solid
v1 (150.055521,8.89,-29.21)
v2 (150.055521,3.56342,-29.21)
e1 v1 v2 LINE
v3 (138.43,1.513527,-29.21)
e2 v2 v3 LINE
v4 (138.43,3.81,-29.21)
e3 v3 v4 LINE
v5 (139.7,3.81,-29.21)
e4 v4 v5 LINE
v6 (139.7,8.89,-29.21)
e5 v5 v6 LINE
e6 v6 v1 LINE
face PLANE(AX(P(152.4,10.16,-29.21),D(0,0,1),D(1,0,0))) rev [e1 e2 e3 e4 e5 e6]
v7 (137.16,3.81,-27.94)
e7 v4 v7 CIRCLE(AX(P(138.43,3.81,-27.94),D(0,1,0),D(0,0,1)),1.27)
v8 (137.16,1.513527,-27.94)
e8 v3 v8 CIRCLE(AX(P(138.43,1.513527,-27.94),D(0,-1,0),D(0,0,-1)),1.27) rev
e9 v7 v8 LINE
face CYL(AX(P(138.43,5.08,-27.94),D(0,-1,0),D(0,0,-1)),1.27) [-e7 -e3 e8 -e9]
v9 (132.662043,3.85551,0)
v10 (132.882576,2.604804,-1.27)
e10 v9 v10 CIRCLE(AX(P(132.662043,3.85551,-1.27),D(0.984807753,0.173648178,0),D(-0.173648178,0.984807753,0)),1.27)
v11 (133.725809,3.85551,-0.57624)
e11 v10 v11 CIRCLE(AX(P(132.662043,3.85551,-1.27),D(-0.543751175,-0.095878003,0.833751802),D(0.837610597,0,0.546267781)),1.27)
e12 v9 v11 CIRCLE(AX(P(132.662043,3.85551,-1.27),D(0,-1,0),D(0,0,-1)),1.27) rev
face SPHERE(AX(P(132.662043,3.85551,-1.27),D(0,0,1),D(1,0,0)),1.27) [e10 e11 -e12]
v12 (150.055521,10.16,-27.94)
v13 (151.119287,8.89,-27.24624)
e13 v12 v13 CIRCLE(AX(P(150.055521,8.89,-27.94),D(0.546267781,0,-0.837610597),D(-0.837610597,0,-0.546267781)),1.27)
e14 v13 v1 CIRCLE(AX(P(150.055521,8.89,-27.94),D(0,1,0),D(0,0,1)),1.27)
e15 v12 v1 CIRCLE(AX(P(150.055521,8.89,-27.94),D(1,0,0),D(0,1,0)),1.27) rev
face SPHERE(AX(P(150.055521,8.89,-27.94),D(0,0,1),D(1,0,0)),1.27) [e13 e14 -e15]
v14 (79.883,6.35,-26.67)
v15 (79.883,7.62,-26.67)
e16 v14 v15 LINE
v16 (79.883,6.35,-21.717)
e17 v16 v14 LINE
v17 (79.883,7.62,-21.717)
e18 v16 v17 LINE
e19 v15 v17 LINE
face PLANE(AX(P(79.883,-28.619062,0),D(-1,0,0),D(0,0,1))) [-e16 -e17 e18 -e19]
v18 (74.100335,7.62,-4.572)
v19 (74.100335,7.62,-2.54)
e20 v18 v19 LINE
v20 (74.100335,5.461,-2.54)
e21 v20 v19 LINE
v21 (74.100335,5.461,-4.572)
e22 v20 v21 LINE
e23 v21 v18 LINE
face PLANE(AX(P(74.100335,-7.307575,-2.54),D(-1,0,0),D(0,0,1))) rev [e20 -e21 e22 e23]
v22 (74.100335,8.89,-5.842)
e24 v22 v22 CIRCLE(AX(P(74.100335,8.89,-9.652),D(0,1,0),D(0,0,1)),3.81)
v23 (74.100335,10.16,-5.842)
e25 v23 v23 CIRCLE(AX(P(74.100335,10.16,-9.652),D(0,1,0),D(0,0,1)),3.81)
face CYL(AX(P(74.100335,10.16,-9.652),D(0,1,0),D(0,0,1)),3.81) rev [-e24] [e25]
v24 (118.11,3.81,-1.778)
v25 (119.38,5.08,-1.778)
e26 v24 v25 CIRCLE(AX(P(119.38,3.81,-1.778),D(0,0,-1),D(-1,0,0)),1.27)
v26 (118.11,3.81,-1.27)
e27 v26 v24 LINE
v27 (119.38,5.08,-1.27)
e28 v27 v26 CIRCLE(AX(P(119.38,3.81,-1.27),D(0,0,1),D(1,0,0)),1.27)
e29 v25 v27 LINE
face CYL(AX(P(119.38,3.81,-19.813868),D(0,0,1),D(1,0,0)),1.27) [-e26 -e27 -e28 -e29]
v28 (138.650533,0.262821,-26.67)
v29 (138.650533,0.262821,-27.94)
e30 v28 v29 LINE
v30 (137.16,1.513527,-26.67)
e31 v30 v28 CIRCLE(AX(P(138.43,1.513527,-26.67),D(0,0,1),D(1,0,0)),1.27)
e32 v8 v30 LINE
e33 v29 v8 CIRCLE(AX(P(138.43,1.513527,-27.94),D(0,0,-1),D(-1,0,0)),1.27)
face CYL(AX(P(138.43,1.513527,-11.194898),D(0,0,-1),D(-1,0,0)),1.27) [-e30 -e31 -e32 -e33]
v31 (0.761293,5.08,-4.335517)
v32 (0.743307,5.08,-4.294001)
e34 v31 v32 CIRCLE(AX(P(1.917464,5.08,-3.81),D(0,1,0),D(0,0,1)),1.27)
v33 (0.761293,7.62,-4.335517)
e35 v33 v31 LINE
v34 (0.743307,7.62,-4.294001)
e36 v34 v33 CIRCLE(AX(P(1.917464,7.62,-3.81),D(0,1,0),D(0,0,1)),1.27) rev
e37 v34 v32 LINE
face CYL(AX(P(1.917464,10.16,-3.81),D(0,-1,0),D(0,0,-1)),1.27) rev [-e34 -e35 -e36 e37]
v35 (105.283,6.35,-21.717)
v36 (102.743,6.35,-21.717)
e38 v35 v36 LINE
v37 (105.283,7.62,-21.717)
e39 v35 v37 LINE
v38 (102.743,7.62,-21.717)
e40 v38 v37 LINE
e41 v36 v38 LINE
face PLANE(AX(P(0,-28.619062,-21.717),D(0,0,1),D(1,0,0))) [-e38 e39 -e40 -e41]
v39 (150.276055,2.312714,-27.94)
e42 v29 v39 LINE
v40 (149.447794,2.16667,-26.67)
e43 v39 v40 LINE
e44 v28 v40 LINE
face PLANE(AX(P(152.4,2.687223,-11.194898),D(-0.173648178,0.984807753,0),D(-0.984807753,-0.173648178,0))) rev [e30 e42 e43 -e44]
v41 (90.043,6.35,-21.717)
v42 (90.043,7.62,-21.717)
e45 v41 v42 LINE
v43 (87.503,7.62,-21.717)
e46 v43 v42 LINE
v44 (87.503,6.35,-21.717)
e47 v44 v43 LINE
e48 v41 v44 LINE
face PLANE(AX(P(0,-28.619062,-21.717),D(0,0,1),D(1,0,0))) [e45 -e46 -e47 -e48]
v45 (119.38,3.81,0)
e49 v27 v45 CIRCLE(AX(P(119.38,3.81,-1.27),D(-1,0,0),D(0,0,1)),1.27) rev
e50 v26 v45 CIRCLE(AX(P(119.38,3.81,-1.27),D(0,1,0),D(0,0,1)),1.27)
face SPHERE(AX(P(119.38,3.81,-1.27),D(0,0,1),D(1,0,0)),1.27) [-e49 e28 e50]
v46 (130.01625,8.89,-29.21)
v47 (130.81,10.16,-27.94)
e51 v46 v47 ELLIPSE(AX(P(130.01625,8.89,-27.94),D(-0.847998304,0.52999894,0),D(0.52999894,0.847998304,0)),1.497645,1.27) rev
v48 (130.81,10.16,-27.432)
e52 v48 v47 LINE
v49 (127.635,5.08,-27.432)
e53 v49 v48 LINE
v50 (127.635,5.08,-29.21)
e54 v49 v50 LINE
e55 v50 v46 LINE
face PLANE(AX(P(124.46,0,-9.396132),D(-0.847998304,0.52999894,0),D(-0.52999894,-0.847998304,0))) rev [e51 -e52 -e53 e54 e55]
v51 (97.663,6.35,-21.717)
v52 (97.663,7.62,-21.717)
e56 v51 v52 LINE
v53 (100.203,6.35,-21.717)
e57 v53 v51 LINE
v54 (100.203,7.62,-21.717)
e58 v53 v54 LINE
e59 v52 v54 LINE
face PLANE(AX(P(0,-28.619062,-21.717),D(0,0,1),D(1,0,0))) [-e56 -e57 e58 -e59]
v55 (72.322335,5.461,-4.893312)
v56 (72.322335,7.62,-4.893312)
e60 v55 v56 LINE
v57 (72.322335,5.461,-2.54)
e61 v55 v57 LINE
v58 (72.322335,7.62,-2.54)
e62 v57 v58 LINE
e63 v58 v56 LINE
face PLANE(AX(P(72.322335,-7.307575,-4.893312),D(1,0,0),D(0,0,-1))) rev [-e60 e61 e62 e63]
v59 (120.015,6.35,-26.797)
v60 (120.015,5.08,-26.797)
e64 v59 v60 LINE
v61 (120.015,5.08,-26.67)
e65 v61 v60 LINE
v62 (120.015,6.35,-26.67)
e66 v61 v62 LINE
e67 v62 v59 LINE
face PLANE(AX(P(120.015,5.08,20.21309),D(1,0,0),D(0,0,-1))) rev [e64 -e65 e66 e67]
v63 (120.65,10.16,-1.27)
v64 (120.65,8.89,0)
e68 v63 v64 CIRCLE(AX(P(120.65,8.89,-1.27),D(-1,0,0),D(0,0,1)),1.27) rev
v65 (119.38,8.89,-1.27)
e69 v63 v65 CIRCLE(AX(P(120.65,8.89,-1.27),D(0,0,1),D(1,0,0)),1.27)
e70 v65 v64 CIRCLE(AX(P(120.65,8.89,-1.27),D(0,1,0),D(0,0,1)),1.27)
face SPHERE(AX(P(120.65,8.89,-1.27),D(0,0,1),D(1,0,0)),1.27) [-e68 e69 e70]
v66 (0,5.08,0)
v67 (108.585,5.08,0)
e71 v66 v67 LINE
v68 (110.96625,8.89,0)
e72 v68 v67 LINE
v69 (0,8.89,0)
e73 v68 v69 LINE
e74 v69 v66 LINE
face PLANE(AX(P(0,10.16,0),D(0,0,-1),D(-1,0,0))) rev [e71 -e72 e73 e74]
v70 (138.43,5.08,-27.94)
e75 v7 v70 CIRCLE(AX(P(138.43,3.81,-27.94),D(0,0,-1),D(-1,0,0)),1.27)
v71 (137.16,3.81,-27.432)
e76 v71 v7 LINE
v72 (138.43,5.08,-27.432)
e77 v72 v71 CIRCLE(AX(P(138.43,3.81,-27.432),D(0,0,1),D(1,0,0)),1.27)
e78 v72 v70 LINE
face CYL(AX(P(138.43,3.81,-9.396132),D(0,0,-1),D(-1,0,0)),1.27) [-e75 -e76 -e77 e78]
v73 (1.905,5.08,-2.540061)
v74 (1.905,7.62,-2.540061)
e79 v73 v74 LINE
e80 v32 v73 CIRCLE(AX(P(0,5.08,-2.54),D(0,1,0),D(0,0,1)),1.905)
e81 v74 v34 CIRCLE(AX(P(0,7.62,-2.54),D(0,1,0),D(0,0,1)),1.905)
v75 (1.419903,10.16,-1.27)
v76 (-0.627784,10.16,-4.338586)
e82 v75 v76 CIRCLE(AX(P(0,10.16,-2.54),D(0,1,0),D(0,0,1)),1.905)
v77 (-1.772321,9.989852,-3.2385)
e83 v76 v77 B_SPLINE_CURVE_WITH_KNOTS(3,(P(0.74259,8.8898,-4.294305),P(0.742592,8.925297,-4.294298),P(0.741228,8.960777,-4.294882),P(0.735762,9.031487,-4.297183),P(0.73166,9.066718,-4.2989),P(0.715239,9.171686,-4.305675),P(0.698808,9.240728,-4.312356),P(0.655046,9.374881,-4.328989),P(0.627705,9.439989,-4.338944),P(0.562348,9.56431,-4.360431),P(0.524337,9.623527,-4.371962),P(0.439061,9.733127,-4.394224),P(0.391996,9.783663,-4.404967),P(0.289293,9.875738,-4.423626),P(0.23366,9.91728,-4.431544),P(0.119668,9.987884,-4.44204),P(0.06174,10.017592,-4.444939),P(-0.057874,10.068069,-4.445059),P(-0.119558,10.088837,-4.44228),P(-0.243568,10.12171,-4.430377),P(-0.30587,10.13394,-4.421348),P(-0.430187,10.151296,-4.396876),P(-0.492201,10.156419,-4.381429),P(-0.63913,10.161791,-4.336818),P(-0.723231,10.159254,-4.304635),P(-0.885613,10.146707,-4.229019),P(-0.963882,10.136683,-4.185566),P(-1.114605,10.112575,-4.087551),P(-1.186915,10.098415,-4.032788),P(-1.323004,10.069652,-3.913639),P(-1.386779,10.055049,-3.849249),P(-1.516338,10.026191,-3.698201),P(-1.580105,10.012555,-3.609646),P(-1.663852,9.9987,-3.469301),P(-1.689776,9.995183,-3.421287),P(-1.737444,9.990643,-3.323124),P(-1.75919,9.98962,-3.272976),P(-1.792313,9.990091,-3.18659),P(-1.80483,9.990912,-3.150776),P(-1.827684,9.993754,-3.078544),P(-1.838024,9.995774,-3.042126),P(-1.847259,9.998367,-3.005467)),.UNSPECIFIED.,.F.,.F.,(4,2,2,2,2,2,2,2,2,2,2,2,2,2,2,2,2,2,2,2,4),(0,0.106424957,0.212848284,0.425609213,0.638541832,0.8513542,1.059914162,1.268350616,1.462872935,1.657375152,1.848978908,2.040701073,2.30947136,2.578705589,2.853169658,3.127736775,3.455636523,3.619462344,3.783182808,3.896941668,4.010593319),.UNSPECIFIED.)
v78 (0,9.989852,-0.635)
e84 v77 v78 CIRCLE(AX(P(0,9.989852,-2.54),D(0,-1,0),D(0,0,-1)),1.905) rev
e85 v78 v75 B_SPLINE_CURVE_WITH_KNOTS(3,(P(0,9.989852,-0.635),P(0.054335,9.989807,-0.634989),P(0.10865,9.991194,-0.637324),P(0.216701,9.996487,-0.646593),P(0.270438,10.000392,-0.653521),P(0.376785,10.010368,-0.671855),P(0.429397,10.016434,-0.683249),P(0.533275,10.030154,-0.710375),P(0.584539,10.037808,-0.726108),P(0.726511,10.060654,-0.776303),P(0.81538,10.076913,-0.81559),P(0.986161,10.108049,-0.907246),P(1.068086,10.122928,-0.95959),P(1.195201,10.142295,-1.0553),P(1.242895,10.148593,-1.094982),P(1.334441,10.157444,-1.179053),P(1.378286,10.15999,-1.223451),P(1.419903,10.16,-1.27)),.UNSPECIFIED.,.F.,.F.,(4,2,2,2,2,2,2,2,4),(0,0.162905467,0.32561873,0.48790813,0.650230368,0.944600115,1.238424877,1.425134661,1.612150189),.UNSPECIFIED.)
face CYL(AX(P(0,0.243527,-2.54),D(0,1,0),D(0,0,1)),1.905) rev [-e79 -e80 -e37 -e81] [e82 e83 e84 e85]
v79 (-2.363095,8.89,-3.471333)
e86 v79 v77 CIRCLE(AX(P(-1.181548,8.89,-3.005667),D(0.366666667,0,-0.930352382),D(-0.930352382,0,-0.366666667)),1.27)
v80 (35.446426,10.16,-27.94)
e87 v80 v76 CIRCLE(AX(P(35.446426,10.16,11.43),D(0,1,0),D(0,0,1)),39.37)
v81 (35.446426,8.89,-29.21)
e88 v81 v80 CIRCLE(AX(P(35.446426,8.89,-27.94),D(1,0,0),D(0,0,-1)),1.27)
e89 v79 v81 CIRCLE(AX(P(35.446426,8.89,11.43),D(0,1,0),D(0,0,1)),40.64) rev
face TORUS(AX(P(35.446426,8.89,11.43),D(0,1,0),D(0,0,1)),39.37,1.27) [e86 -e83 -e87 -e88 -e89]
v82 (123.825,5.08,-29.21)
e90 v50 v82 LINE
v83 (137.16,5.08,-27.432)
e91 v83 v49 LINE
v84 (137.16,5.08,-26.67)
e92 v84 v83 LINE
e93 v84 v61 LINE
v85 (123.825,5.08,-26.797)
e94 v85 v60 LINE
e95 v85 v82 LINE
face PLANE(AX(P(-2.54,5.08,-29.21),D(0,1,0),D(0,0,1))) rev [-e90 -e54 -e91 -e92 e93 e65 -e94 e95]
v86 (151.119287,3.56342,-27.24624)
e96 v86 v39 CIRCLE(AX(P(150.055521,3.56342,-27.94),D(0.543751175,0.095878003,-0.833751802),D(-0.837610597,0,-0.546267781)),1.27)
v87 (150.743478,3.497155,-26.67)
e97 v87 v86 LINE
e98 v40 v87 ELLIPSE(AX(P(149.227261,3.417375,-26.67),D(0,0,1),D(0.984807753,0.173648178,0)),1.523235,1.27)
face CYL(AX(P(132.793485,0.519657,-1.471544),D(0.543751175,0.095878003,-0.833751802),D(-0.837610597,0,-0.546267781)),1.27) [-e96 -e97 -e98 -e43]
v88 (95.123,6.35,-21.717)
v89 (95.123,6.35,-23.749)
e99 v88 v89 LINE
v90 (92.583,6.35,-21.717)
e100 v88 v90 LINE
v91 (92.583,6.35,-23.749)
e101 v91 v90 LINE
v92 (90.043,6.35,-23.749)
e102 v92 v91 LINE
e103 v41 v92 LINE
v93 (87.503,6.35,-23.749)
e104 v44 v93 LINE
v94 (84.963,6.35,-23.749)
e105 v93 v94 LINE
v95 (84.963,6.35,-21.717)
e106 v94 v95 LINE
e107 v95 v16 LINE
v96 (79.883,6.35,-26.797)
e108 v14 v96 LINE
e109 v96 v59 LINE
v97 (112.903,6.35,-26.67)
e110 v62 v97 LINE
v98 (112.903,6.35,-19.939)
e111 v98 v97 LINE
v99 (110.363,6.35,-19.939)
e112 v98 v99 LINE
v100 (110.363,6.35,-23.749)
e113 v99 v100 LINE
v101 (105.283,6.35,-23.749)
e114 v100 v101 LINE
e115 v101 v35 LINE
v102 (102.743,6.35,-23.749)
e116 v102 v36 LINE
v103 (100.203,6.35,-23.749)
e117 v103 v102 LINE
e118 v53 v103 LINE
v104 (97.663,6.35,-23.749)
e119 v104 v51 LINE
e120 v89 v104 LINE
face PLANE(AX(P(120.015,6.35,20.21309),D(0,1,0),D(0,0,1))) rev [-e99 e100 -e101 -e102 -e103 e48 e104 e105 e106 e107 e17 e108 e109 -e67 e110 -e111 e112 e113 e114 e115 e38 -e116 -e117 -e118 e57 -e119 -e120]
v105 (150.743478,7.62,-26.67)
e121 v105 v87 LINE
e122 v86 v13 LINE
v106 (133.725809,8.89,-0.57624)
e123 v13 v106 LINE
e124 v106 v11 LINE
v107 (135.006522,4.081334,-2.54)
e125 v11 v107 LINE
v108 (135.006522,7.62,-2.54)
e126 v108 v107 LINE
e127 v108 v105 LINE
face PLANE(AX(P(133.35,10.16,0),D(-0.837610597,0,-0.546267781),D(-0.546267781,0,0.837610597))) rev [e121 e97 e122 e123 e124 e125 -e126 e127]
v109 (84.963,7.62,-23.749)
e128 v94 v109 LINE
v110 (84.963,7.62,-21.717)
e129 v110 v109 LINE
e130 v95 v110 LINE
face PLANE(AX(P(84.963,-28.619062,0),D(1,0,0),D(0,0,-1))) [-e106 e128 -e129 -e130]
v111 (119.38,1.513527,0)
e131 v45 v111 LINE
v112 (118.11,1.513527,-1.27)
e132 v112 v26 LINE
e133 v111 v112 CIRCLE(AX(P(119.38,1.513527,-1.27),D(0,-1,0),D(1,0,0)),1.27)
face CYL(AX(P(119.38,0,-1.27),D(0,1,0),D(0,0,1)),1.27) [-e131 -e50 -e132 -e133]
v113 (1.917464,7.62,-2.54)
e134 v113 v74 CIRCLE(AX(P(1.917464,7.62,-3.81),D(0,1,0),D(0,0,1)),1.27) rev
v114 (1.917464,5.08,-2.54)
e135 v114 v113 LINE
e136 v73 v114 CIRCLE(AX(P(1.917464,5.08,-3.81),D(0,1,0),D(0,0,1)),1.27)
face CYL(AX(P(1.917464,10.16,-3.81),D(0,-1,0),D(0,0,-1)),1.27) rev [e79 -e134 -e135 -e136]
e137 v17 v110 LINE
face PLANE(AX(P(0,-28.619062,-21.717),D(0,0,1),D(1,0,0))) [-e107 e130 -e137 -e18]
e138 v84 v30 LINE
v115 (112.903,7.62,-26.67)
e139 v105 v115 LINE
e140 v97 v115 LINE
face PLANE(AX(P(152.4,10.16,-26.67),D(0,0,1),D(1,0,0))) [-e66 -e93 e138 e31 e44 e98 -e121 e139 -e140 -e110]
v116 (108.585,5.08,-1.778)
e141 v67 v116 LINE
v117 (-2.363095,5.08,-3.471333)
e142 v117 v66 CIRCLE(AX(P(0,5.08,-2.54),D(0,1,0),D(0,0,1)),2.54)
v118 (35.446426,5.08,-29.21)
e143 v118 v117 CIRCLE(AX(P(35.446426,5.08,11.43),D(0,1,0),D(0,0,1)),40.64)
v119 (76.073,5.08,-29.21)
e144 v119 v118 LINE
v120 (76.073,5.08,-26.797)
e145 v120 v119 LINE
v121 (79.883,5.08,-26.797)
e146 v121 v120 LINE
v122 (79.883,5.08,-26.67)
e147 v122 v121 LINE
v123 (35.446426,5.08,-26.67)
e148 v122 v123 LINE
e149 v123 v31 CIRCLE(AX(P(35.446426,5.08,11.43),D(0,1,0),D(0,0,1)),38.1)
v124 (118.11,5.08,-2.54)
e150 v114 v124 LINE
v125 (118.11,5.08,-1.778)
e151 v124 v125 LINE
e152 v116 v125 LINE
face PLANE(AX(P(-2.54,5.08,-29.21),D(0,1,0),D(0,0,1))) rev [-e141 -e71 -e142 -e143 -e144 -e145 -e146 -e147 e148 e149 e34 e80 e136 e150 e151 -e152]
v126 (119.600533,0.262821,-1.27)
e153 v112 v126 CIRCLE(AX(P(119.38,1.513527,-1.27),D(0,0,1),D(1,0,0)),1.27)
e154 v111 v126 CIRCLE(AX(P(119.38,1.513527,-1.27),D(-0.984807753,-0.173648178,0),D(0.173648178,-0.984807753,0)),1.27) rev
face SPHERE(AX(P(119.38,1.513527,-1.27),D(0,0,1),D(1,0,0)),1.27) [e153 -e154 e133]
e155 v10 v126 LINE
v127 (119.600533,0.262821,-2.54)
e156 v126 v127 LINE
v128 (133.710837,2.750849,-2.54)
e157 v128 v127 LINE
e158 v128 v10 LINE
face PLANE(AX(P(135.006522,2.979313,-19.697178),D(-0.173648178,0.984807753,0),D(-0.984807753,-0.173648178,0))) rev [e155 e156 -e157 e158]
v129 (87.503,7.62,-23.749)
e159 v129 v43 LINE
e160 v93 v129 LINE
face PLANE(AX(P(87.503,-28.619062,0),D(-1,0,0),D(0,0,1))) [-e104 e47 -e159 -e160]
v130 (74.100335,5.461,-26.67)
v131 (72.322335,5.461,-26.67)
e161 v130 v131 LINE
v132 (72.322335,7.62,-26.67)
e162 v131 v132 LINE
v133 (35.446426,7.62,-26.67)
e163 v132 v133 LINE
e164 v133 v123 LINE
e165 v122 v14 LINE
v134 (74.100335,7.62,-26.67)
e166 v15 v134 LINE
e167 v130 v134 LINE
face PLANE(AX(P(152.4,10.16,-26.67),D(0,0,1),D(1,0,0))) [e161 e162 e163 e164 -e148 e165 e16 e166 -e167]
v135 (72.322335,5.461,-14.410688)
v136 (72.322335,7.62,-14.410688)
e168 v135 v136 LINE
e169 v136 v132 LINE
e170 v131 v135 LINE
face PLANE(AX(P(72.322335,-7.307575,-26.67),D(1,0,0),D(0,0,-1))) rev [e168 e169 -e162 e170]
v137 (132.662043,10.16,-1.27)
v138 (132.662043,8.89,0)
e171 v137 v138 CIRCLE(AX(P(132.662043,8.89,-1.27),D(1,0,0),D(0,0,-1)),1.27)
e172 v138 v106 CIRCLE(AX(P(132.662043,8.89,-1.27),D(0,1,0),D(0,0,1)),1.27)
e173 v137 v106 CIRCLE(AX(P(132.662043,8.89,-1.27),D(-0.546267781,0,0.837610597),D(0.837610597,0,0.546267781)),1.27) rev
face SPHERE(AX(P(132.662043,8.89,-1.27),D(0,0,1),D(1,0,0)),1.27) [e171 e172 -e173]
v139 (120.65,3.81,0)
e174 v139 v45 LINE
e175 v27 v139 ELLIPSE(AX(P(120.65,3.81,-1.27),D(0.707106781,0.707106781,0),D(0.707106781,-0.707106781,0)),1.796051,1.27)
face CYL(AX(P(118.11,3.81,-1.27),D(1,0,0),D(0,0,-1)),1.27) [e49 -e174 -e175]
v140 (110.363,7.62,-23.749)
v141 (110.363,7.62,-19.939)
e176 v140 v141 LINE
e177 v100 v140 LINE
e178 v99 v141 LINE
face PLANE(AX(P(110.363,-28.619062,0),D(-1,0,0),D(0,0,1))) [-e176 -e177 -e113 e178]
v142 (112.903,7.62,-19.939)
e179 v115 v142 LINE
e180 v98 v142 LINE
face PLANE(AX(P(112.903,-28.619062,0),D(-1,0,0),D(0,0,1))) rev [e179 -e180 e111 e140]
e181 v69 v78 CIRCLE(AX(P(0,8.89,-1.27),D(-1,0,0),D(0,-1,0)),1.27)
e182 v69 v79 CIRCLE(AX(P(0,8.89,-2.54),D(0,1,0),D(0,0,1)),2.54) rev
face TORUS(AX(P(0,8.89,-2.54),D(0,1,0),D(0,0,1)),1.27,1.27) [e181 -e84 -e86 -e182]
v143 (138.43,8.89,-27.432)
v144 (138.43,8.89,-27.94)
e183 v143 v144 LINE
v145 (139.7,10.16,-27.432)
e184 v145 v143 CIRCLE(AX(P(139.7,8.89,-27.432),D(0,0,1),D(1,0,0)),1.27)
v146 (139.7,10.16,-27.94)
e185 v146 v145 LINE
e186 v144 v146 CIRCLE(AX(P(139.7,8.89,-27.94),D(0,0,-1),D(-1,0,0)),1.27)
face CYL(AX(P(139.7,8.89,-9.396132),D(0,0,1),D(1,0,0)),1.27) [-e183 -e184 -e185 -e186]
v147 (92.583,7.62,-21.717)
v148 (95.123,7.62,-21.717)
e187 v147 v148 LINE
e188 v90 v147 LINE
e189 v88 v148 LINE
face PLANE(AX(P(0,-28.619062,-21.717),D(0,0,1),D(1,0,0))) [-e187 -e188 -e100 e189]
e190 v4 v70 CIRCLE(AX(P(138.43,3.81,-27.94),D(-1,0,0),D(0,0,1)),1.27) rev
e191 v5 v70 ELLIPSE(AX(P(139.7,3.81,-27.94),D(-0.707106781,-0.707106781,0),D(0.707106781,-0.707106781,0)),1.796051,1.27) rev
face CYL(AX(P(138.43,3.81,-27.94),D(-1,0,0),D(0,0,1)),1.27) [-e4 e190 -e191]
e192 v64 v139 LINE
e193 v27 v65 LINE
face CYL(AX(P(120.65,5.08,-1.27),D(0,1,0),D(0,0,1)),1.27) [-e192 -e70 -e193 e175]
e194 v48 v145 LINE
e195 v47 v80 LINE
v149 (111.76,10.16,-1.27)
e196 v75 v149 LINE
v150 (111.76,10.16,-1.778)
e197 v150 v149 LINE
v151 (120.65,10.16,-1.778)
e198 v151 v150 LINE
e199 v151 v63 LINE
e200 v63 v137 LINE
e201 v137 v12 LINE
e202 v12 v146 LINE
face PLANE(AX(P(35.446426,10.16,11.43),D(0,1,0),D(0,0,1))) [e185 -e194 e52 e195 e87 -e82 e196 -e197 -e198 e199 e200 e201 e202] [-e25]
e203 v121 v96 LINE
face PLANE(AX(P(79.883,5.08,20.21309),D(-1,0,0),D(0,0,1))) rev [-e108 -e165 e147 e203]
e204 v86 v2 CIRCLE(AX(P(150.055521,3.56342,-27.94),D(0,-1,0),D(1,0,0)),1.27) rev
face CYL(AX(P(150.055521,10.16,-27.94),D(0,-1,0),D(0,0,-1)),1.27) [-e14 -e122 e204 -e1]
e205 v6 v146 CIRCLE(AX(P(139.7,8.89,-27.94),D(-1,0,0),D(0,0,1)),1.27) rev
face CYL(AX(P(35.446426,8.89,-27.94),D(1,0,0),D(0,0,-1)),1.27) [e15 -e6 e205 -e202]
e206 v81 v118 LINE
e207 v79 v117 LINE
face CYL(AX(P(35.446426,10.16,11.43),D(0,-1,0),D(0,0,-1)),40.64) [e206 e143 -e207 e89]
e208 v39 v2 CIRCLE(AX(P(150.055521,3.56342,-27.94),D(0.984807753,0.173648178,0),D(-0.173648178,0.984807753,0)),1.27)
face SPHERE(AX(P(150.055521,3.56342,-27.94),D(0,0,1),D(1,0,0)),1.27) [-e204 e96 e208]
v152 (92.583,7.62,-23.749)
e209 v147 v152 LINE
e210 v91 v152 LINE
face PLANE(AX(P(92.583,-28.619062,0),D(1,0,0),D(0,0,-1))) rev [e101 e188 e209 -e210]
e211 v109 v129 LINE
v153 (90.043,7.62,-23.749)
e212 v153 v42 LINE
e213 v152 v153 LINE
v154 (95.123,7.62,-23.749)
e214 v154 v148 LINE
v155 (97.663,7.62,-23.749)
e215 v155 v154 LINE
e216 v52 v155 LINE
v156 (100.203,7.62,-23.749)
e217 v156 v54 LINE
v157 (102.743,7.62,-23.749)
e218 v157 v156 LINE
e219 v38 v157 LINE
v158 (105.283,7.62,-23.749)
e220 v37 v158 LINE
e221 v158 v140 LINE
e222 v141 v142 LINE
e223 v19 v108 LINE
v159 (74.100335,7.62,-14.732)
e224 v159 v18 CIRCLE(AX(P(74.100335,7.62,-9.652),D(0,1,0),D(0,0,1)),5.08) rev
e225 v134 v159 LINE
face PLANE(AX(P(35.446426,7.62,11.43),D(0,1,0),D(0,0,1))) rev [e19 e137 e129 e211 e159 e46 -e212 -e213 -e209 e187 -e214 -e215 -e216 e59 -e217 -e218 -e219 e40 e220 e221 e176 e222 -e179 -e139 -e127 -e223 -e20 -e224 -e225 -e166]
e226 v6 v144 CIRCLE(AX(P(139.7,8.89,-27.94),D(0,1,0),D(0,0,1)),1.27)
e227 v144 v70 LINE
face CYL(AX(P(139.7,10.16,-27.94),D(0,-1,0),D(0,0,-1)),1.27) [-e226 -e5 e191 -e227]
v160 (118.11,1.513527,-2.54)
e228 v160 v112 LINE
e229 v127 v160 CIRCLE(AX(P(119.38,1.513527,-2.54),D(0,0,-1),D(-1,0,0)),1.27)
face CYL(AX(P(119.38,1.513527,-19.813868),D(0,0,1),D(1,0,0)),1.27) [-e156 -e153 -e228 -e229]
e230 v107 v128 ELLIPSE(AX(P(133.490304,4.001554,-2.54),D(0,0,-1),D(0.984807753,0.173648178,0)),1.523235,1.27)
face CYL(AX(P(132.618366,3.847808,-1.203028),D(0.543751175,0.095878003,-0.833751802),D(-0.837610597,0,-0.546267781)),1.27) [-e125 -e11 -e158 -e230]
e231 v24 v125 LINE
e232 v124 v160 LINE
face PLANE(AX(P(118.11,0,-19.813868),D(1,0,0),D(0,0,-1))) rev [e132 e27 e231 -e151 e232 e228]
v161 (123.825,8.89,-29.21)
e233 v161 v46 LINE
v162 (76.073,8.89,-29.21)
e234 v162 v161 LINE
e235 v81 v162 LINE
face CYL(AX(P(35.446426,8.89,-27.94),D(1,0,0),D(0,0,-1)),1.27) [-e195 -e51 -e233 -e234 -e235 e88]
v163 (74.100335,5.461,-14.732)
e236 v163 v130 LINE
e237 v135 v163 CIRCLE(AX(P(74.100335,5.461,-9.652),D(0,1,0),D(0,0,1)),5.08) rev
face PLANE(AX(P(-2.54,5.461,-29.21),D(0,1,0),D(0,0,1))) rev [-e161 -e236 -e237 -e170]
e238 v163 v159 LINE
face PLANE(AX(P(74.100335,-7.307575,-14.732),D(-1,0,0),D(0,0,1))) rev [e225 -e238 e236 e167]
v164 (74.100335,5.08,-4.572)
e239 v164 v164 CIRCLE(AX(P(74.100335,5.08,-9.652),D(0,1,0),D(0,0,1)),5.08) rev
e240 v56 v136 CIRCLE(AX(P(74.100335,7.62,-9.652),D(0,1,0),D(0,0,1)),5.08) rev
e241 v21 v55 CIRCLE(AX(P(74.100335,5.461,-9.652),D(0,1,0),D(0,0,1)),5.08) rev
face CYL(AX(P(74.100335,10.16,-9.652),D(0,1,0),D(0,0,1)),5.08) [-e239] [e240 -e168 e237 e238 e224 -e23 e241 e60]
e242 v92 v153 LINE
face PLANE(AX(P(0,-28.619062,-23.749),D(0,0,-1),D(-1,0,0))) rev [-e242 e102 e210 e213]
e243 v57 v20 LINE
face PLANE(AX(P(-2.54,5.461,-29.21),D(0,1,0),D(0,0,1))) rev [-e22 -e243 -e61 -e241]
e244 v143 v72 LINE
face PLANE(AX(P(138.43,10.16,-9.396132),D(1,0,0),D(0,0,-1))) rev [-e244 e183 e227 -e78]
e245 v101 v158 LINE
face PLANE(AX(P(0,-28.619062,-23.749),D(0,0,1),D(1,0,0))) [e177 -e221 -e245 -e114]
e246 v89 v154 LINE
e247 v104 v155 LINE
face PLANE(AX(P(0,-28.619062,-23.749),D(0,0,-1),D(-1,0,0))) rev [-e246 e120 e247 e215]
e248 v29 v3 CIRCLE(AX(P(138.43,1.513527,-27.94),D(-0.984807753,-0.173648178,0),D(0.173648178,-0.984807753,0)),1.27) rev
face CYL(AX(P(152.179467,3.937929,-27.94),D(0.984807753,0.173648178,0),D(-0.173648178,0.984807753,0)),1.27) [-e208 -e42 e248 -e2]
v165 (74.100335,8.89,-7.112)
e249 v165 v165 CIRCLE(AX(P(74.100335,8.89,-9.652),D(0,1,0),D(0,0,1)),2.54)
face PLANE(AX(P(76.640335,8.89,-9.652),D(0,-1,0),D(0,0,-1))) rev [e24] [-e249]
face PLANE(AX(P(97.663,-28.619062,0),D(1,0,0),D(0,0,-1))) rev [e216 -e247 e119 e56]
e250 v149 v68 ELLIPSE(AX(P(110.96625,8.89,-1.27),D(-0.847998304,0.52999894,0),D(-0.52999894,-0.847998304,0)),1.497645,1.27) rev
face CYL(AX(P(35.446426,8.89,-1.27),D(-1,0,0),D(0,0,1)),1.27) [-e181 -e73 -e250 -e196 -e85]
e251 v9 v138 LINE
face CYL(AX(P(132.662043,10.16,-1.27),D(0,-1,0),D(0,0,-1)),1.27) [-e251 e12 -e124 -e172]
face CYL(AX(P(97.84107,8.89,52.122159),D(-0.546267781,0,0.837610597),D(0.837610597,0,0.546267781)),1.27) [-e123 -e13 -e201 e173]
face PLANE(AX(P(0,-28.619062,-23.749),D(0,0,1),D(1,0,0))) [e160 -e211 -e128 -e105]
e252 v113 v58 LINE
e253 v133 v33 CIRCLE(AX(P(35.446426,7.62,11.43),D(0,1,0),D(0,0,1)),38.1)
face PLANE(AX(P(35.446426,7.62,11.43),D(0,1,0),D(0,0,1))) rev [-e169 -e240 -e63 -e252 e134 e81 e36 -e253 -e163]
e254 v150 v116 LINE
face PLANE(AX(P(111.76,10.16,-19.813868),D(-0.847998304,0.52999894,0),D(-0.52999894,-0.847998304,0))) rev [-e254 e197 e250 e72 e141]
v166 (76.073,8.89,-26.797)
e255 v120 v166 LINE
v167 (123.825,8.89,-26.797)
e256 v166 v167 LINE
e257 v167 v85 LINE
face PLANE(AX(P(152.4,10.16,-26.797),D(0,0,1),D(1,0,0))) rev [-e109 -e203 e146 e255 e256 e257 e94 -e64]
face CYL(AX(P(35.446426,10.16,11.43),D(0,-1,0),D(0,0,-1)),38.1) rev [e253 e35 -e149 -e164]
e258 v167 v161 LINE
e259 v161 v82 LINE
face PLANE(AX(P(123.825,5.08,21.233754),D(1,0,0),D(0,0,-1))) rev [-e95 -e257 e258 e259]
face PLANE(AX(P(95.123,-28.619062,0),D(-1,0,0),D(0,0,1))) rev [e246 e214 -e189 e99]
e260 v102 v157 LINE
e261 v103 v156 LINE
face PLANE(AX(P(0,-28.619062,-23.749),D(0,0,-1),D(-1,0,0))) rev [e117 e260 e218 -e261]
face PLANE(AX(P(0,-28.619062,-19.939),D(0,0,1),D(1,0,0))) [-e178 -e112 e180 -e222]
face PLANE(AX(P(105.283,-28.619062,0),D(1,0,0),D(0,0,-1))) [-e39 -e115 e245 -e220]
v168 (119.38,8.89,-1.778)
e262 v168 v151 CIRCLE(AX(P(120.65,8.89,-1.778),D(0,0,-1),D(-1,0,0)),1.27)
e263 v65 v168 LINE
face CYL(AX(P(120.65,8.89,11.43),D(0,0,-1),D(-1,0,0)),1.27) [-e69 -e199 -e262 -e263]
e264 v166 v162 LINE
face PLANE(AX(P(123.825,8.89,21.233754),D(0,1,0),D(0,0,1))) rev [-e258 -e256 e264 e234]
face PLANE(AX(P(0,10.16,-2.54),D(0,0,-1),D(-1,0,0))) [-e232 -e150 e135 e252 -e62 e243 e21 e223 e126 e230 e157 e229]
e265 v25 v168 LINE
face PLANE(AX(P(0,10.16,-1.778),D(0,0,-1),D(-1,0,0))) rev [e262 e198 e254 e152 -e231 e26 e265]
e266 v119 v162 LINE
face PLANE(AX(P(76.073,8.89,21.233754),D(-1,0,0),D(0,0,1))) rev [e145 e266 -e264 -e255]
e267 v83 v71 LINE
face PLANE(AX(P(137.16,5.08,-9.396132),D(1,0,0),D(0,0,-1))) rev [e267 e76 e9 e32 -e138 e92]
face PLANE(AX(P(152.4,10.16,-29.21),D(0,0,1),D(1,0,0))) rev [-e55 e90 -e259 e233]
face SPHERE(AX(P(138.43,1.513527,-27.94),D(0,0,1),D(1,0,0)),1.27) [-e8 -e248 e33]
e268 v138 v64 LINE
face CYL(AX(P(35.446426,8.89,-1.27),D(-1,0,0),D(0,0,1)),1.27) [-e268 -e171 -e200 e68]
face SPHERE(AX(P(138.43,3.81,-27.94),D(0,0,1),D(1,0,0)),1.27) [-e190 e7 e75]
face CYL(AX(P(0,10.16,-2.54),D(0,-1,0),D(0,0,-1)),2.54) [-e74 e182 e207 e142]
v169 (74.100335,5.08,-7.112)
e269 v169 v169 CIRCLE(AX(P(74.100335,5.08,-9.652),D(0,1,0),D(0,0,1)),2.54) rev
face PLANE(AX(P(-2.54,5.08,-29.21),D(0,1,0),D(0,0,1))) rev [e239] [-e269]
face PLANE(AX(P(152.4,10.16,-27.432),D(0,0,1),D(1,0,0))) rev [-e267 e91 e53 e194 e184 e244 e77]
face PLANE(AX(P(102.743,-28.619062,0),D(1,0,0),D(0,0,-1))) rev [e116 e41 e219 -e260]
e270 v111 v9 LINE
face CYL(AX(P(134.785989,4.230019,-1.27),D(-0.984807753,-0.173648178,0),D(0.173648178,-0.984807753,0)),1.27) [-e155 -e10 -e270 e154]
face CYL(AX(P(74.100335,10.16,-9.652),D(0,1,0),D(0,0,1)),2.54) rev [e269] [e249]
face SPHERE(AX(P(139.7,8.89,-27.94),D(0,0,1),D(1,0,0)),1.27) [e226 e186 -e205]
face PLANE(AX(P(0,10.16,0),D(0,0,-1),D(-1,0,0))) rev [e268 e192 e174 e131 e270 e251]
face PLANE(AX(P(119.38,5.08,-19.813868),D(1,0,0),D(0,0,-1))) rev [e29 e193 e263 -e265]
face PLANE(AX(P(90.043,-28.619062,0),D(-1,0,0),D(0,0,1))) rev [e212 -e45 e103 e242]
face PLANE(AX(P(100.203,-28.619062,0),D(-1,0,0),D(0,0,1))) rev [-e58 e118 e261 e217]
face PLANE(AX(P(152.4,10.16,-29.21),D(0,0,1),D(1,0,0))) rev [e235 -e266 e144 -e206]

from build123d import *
from build123d.topology import SkipClean

# Parameters (mm, degrees)
BOSS_EXTRUDE1_DEPTH                                 = 10.16
CBORE_FOR_0_BINDING_HEAD_MACHINE_SCREW1_D           = 5.08
CBORE_FOR_0_BINDING_HEAD_MACHINE_SCREW1_CBORE_D     = 7.62
CBORE_FOR_0_BINDING_HEAD_MACHINE_SCREW1_CBORE_DEPTH = 1.27
SHELL1_OUTLINE_R                                    = 6.35
SHELL1_DEPTH                                        = 7.62
SHELL1_2_OUTLINE_R                                  = 6.35
SHELL1_2_OUTLINE_R_2                                = 5.08
SHELL1_2_DEPTH                                      = 6.35
CUT_EXTRUDE1_DEPTH                                  = 1.778
CUT_EXTRUDE2_DEPTH                                  = 1.778
CUT_EXTRUDE5_REACH                                  = 157.506
CUT_EXTRUDE6_REACH                                  = 157.506
CUT_EXTRUDE3_DEPTH                                  = 156.506301159
CUT_EXTRUDE3_DEPTH_BACK                             = 156.506301159
SKETCH4_W                                           = 120.65
SKETCH4_H                                           = 5.08
SKETCH5_W                                           = 19.05
SKETCH5_H                                           = 5.08
CUT_EXTRUDE4_DEPTH                                  = 2.54
SKETCH9_W                                           = 47.752
SKETCH9_H                                           = 3.81
CUT_EXTRUDE7_DEPTH                                  = 2.413
FILLET1_R                                           = 1.27
BOSS_EXTRUDE2_DEPTH                                 = 2.54
SKETCH11_W                                          = 40.132
SKETCH11_H                                          = 1.27
CUT_EXTRUDE9_DEPTH                                  = 6.858
SKETCH20_R                                          = 6.35
SKETCH20_R_2                                        = 5.08
CUT_EXTRUDE11_DEPTH                                 = 1.27
BOSS_EXTRUDE4_START                                 = 2.159
BOSS_EXTRUDE4_DEPTH                                 = 2.159
SKETCH36_R                                          = 1.905
CUT_EXTRUDE18_DEPTH                                 = 155.437689597


# Read off the part's stored shape, not the designer's step: Shell1
with BuildPart() as part:
    # Sketch1 → Boss-Extrude1 (new body)
    with BuildSketch(Plane(origin=(0, 0, 0), x_dir=(1, 0, 0), z_dir=(0, 1, 0))):
        with BuildLine():
            Line((0, 0), (133.35, 0))
            Line((133.35, 0), (152.4, 29.21))
            Line((152.4, 29.21), (35.446425772, 29.21))
            ThreePointArc((35.446425772, 29.21), (12.577020299, 22.164640842), (-2.363095051, 3.471333333))
            ThreePointArc((-2.363095051, 3.471333333), (-2.099665053, 1.110662158), (0, 0))
        make_face()
    extrude(amount=BOSS_EXTRUDE1_DEPTH)

    # CBORE for #0 Binding Head Machine Screw1 (through all)
    with Locations(Plane(origin=(0, 10.16, 0), x_dir=(1, 0, 0), z_dir=(0, 1, 0))):
        with Locations((74.100334947, 9.652)):
            CounterBoreHole(CBORE_FOR_0_BINDING_HEAD_MACHINE_SCREW1_D / 2, CBORE_FOR_0_BINDING_HEAD_MACHINE_SCREW1_CBORE_D / 2, CBORE_FOR_0_BINDING_HEAD_MACHINE_SCREW1_CBORE_DEPTH)

    # Shell1 outline → Shell1 (cut)
    with BuildSketch(Plane(origin=(0, 0, 0), x_dir=(1, 0, 0), z_dir=(0, 1, 0))):
        with BuildLine():
            Line((150.743478261, 26.67), (35.446425772, 26.67))
            ThreePointArc((35.446425772, 26.67), (14.006358141, 20.06497579), (0, 2.54))
            Line((0, 2.54), (135.006521739, 2.54))
            Line((135.006521739, 2.54), (150.743478261, 26.67))
        make_face()
        with Locations((74.100334947, 9.652)):
            Circle(SHELL1_OUTLINE_R, mode=Mode.SUBTRACT)
    extrude(amount=SHELL1_DEPTH, mode=Mode.SUBTRACT)

    # Shell1 2 outline → Shell1 2 (cut)
    with BuildSketch(Plane(origin=(0, 0, 0), x_dir=(1, 0, 0), z_dir=(0, 1, 0))):
        with Locations((74.100334947, 9.652)):
            Circle(SHELL1_2_OUTLINE_R)
        with Locations((74.100334947, 9.652)):
            Circle(SHELL1_2_OUTLINE_R_2, mode=Mode.SUBTRACT)
    extrude(amount=SHELL1_2_DEPTH, mode=Mode.SUBTRACT)

    # Sketch2 → Cut-Extrude1 (cut)
    with BuildSketch(Plane.XY):
        Polygon((118.11, 0), (118.11, 5.08), (119.38, 5.08), (119.38, 10.16), (111.76, 10.16), (105.41, 0), align=None)
    extrude(amount=-CUT_EXTRUDE1_DEPTH, mode=Mode.SUBTRACT)

    # Sketch3 → Cut-Extrude2 (cut)
    with BuildSketch(Plane(origin=(0, 0, -29.21), x_dir=(-1, 0, 0), z_dir=(0, 0, -1))):
        Polygon((-138.43, 10.16), (-138.43, 5.08), (-137.16, 5.08), (-137.16, 0), (-124.46, 0), (-130.81, 10.16), align=None)
    extrude(amount=-CUT_EXTRUDE2_DEPTH, mode=Mode.SUBTRACT)

    # Cut-Extrude5: up to this face of the body (flat: up to its plane)
    cut_extrude5_end = Plane(part.part.faces().sort_by_distance((67.503260869, 3.81, -2.54))[0])
    # Sketch7 → Cut-Extrude5 (cut, up to the picked face)
    with BuildSketch(Plane.XY, mode=Mode.PRIVATE) as cut_extrude5_sk1:
        Polygon((135.006521739, 2.979312663), (118.11, 0), (135.006521739, 0), align=None)
    cut_extrude5_tool1 = split(extrude(cut_extrude5_sk1.sketch, amount=-CUT_EXTRUDE5_REACH, mode=Mode.PRIVATE), bisect_by=cut_extrude5_end, keep=Keep.BOTH, mode=Mode.PRIVATE)
    add(cut_extrude5_tool1.solids().sort_by(Axis((129.374348, 0.993104, 0), (0, 0, -1)))[0], mode=Mode.SUBTRACT)

    # Cut-Extrude6: up to this face of the body (flat: up to its plane)
    cut_extrude6_end = Plane(part.part.faces().sort_by_distance((93.094952017, 3.81, -26.67))[0])
    # Sketch8 → Cut-Extrude6 (cut, up to the picked face)
    with BuildSketch(Plane(origin=(0, 0, -29.21), x_dir=(-1, 0, 0), z_dir=(0, 0, -1)), mode=Mode.PRIVATE) as cut_extrude6_sk1:
        Polygon((-152.4, 2.687223186), (-137.16, 0), (-152.4, 0), align=None)
    cut_extrude6_tool1 = split(extrude(cut_extrude6_sk1.sketch, amount=-CUT_EXTRUDE6_REACH, mode=Mode.PRIVATE), bisect_by=cut_extrude6_end, keep=Keep.BOTH, mode=Mode.PRIVATE)
    add(cut_extrude6_tool1.solids().sort_by(Axis((147.32, 0.895741, -29.21), (0, 0, 1)))[0], mode=Mode.SUBTRACT)

    # Sketch4 → Cut-Extrude3 (cut, two sides: drawn at the far end of the back side and taken through both)
    with BuildSketch(Plane.XY.offset(-CUT_EXTRUDE3_DEPTH_BACK)):
        with Locations((57.785, 2.54)):
            Rectangle(SKETCH4_W, SKETCH4_H)
    extrude(amount=CUT_EXTRUDE3_DEPTH + CUT_EXTRUDE3_DEPTH_BACK, mode=Mode.SUBTRACT)

    # Sketch5 → Cut-Extrude4 (cut)
    with BuildSketch(Plane(origin=(0, 0, -29.21), x_dir=(-1, 0, 0), z_dir=(0, 0, -1))):
        with Locations((-127.635, 2.54)):
            Rectangle(SKETCH5_W, SKETCH5_H)
    extrude(amount=-CUT_EXTRUDE4_DEPTH, mode=Mode.SUBTRACT)

    # Sketch9 → Cut-Extrude7 (cut)
    with BuildSketch(Plane(origin=(0, 0, -29.21), x_dir=(-1, 0, 0), z_dir=(0, 0, -1))):
        with Locations((-99.949, 6.985)):
            Rectangle(SKETCH9_W, SKETCH9_H)
    extrude(amount=-CUT_EXTRUDE7_DEPTH, mode=Mode.SUBTRACT)

    # Fillet1
    fillet1_edges = [part.edges().sort_by_distance(p)[0] for p in [
        (145.415, 10.16, -29.21),
        (142.875, 10.16, -14.605),
        (126.365, 10.16, 0),
        (119.38, 10.16, -0.889),
        (55.88, 10.16, 0),
        (-2.099665053, 10.16, -1.110662158),
        (12.577020299, 10.16, -22.164640842),
        (83.128212886, 10.16, -29.21),
        (138.43, 10.16, -28.321),
        (133.35, 6.423611593, 0),
        (152.4, 6.423611593, -29.21),
        (0, 6.35, -2.54),
        (118.745, 5.08, 0),
        (118.11, 2.54, 0),
        (119.38, 7.62, 0),
        (137.16, 2.54, -29.21),
        (137.795, 5.08, -29.21),
        (138.43, 7.62, -29.21),
        (144.78, 1.343611593, -29.21),
        (125.73, 1.343611593, 0),
        (151.57173913, 2.541178448, -27.94),
        (134.17826087, 2.833267924, -1.27),
        (137.16, 5.08, -28.321),
        (118.11, 0, -1.27),
        (118.11, 5.08, -0.889),
        (137.16, 0, -27.94),
    ]]
    fillet(fillet1_edges, radius=FILLET1_R - 0.0001)  # a hair under: the kernel refuses the full size

    # Sketch10 → Boss-Extrude2 (add)
    with BuildSketch(Plane.XZ.offset(-7.62)):
        Polygon((79.883, -21.717), (79.883, -26.67), (112.903, -26.67), (112.903, -19.939), (110.363, -19.939), (110.363, -23.749), (105.283, -23.749), (105.283, -21.717), (102.743, -21.717), (102.743, -23.749), (100.203, -23.749), (100.203, -21.717), (97.663, -21.717), (97.663, -23.749), (95.123, -23.749), (95.123, -21.717), (92.583, -21.717), (92.583, -23.749), (90.043, -23.749), (90.043, -21.717), (87.503, -21.717), (87.503, -23.749), (84.963, -23.749), (84.963, -21.717), align=None)
    extrude(amount=BOSS_EXTRUDE2_DEPTH)

    # Sketch11 → Cut-Extrude9 (cut)
    with BuildSketch(Plane(origin=(0, 0, -26.797), x_dir=(-1, 0, 0), z_dir=(0, 0, -1))):
        with Locations((-99.949, 5.715)):
            Rectangle(SKETCH11_W, SKETCH11_H)
    extrude(amount=-CUT_EXTRUDE9_DEPTH, mode=Mode.SUBTRACT)

    # Sketch20 → Cut-Extrude11 (cut)
    with SkipClean():  # the faces are left unmerged after this step: merging them gives an invalid solid
        with BuildSketch(Plane.XZ.offset(-6.35)):
            with Locations((74.100334947, -9.652)):
                Circle(SKETCH20_R)
            with Locations(Location((74.100334947, -9.652, 0), (0, 0, 90))):
                Circle(SKETCH20_R_2, mode=Mode.SUBTRACT)
        extrude(amount=-CUT_EXTRUDE11_DEPTH, mode=Mode.SUBTRACT)

    # Sketch21 → Boss-Extrude4 (add)
    with BuildSketch(Plane.XZ.offset(-7.62).offset(BOSS_EXTRUDE4_START)):
        with BuildLine():
            Line((74.100334947, -2.54), (74.100334947, -4.572))
            ThreePointArc((74.100334947, -4.572), (73.196935106, -4.652973222), (72.322334947, -4.893311525))
            Line((72.322334947, -4.893311525), (72.322334947, -2.54))
            Line((72.322334947, -2.54), (74.100334947, -2.54))
        make_face()
        with BuildLine():
            Line((74.100334947, -14.732), (74.100334947, -26.67))
            Line((74.100334947, -26.67), (72.322334947, -26.67))
            Line((72.322334947, -26.67), (72.322334947, -14.410688475))
            ThreePointArc((72.322334947, -14.410688475), (73.196935106, -14.651026778), (74.100334947, -14.732))
        make_face()
    extrude(amount=-BOSS_EXTRUDE4_DEPTH)

    # Sketch36 → Cut-Extrude18 (cut, through all)
    with SkipClean():  # the faces are left unmerged after this step: merging them gives an invalid solid
        with BuildSketch(Plane(origin=(0, 10.16, 0), x_dir=(1, 0, 0), z_dir=(0, 1, 0))):
            with Locations(Location((0, 2.54, 0), (0, 0, 270))):
                Circle(SKETCH36_R)
        extrude(amount=-CUT_EXTRUDE18_DEPTH, mode=Mode.SUBTRACT)


solid = part.part
